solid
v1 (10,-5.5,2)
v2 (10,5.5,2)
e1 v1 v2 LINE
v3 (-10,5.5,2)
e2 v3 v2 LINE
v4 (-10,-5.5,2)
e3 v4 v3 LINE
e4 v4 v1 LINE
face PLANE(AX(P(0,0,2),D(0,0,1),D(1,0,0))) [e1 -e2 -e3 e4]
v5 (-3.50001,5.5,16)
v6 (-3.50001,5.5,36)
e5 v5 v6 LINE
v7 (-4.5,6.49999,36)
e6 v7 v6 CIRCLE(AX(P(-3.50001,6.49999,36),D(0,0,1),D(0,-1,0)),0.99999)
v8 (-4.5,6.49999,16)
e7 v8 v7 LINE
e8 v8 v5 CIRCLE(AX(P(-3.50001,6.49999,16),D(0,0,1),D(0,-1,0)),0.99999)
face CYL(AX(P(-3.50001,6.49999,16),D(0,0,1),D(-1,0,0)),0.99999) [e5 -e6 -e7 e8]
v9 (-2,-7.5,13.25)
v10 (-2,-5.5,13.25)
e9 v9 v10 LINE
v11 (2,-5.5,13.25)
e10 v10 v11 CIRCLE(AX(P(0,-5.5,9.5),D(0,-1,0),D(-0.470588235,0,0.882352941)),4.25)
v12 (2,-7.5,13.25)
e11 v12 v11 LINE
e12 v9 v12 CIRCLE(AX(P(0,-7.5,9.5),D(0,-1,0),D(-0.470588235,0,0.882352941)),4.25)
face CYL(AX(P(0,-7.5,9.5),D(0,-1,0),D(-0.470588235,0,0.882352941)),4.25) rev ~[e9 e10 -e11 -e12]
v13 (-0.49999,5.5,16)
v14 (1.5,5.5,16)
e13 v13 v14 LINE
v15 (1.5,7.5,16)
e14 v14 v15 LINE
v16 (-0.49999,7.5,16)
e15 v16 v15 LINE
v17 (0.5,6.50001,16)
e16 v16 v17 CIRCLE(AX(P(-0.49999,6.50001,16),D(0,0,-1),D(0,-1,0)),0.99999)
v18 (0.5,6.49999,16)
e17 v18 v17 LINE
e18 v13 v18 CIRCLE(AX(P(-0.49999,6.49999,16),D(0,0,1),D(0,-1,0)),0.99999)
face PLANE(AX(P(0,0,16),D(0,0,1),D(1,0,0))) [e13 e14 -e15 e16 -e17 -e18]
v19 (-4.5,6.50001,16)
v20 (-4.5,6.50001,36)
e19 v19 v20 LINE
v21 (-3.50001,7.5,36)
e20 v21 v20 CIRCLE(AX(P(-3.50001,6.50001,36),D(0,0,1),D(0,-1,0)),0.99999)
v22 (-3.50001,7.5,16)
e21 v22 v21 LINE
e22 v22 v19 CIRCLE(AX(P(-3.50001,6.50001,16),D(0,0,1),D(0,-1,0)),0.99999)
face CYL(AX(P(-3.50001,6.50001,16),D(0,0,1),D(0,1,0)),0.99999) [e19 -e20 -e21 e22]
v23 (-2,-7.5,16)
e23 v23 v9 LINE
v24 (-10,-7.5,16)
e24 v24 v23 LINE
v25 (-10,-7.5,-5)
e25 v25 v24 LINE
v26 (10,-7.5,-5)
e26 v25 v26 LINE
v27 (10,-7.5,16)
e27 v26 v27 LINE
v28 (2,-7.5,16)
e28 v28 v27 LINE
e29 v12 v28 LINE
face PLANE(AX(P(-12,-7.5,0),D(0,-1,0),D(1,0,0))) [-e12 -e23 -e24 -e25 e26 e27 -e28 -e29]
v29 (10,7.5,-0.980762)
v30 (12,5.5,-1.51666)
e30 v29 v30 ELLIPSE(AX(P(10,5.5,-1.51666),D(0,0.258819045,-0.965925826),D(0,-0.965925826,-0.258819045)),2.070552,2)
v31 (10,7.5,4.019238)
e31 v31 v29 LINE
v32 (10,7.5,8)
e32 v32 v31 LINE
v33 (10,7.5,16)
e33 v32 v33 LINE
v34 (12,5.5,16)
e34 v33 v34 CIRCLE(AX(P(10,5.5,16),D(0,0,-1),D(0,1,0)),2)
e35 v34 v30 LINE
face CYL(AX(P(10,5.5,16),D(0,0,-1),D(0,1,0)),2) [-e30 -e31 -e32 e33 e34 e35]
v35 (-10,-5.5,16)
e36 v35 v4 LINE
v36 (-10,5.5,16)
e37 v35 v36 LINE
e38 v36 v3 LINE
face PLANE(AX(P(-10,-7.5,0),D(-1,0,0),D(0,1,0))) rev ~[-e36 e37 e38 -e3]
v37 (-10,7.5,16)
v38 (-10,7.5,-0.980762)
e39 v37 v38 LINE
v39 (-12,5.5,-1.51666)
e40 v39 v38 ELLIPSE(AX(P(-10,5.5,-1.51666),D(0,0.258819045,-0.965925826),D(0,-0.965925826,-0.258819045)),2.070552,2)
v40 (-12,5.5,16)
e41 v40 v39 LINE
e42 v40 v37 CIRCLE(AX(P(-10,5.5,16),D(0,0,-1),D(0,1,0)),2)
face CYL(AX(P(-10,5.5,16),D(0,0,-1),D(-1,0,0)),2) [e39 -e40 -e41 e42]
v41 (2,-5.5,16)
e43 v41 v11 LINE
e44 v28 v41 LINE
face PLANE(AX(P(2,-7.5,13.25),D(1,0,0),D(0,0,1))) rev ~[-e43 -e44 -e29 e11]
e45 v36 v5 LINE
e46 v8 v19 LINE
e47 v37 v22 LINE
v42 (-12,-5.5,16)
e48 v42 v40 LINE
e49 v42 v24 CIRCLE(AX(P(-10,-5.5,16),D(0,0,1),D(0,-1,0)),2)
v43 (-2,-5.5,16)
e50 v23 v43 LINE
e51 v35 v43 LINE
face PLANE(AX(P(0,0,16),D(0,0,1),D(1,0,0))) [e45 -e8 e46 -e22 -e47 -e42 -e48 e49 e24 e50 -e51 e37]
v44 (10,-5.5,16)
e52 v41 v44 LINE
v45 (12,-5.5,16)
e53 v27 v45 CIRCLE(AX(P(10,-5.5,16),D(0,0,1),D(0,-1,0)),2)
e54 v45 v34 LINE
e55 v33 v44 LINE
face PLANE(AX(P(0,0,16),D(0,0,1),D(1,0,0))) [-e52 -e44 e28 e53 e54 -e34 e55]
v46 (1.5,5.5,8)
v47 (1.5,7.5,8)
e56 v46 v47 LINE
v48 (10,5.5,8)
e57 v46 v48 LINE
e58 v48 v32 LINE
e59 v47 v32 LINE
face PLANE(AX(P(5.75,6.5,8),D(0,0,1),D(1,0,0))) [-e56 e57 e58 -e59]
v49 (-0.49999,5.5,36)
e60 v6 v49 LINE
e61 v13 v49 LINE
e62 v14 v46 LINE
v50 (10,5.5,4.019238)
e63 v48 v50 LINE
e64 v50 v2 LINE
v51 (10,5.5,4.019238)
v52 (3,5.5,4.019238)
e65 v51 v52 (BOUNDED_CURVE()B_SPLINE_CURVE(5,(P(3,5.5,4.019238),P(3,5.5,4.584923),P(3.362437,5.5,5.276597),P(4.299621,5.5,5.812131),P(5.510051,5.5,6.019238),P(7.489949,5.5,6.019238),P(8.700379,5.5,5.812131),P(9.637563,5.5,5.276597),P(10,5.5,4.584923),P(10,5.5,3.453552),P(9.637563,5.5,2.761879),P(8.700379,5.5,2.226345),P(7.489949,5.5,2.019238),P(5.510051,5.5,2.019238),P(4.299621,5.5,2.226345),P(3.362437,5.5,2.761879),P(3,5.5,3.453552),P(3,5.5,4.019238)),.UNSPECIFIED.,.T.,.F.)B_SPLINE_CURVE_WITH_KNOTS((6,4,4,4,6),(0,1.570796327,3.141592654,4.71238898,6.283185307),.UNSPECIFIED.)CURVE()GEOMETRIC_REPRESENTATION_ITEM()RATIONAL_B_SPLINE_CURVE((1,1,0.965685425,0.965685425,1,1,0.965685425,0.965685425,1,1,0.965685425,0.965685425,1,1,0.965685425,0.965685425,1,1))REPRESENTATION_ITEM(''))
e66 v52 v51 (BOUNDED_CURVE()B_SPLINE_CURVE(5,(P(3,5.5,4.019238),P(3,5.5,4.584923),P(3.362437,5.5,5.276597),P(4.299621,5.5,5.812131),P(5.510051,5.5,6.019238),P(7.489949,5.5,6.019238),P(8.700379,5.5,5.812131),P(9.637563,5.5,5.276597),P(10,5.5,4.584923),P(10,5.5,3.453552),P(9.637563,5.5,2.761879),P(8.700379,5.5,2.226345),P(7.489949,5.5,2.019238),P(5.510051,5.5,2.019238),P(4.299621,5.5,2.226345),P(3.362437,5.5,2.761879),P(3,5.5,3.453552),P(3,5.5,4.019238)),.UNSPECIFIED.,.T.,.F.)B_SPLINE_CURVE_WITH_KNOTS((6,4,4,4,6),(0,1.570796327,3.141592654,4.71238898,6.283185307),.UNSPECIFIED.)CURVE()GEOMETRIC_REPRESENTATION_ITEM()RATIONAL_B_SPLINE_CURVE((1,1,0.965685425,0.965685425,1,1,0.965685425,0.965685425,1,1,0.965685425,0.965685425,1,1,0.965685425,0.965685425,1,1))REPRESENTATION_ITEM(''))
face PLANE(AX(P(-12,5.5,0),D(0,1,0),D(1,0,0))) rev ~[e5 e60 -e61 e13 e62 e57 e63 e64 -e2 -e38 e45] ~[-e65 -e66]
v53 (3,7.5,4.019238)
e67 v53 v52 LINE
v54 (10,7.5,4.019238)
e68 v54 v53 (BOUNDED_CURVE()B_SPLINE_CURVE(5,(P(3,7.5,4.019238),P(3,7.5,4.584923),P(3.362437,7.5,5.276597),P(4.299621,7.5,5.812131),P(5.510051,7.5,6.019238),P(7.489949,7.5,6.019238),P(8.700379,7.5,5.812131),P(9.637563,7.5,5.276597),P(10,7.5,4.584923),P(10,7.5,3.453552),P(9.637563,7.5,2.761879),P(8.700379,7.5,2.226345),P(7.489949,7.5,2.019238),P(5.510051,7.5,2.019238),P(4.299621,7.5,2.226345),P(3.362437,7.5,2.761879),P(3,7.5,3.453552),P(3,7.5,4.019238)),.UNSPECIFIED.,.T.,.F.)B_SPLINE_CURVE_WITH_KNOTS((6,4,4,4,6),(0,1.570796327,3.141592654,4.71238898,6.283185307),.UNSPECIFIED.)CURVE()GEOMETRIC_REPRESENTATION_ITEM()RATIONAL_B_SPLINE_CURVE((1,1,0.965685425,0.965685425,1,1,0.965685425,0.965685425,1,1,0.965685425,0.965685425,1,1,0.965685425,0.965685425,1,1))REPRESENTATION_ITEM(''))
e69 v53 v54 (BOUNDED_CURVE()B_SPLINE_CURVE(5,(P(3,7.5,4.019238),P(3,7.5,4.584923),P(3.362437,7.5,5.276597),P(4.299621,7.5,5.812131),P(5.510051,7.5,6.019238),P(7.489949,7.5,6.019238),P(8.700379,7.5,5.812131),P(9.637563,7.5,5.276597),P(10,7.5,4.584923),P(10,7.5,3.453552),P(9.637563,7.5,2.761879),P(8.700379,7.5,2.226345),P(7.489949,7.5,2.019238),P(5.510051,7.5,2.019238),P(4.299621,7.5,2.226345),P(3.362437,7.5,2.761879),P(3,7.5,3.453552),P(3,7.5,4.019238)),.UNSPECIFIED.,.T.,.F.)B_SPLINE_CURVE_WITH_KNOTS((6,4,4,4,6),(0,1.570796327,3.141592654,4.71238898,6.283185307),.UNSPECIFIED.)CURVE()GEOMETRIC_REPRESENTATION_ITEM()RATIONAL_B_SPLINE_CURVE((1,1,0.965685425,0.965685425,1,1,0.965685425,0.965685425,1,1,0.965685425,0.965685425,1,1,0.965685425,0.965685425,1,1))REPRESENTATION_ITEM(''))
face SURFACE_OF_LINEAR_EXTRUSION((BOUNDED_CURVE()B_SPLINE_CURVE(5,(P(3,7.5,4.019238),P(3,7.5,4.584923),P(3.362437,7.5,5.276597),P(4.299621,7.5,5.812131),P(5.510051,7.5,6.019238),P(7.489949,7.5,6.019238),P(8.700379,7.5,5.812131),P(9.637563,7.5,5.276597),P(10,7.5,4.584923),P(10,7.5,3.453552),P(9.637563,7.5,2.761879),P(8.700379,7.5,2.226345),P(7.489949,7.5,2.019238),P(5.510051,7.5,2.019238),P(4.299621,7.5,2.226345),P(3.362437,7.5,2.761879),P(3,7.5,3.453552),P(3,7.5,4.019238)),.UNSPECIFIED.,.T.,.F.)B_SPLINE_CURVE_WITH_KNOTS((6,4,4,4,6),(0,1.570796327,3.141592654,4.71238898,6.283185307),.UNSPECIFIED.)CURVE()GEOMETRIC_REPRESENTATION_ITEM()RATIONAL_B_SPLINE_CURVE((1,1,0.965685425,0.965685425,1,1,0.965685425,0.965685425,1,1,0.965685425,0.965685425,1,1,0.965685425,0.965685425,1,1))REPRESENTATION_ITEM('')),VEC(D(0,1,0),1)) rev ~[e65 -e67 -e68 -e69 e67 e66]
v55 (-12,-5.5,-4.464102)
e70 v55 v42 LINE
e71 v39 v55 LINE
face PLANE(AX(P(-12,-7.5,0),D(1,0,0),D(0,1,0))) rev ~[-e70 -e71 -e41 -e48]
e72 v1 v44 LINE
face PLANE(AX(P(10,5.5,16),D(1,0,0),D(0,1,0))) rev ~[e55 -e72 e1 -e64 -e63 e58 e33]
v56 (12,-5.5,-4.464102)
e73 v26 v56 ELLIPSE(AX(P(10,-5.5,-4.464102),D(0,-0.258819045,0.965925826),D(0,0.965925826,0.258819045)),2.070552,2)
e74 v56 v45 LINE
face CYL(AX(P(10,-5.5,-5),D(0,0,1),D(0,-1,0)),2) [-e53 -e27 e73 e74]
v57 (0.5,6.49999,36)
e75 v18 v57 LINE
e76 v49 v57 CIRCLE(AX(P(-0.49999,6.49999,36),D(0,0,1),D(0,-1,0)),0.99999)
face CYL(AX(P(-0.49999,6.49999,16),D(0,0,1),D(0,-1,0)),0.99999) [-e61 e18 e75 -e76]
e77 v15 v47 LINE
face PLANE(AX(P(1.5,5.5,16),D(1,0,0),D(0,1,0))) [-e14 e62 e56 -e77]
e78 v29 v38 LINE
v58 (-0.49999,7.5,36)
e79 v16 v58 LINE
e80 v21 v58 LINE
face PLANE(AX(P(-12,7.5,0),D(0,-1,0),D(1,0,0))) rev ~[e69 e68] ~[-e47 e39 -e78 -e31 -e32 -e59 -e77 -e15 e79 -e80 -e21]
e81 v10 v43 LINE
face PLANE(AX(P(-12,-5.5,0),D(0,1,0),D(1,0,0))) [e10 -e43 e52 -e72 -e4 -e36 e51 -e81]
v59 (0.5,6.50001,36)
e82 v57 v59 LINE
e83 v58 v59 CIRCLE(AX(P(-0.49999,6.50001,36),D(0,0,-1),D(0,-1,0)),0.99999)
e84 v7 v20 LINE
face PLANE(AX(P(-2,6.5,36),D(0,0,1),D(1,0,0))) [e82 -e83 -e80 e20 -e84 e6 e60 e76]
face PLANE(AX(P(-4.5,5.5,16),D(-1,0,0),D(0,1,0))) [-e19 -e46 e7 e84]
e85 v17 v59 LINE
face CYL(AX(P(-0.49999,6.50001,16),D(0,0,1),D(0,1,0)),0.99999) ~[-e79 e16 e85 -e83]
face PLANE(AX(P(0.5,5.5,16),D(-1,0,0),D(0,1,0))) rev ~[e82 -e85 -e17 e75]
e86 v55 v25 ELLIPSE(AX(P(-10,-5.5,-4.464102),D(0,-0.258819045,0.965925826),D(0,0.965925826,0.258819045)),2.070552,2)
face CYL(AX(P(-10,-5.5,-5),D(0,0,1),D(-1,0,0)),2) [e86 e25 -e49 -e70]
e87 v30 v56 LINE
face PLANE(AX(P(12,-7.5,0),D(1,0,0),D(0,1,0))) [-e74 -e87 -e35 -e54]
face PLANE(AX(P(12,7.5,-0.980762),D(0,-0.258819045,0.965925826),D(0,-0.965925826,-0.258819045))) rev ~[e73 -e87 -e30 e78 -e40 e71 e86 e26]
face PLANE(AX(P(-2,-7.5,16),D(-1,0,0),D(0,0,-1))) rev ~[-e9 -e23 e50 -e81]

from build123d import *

# Parameters (mm, degrees)
F0_W      = 24
F0_H      = 15
F1_DEPTH  = 16
F2_T      = -2
F4_DEPTH  = 5
F5_W      = 5
F5_H      = 2
F6_DEPTH  = 20
F7_R      = 0.99999
F8_W      = 8.5
F8_H      = 2
F9_DEPTH  = 8
F10_DEPTH = 5
F12_DEPTH = 25
F13_R     = 2
F15_DEPTH = 2


# Not quite as in the source:
# - a fillet or chamfer is up to 0.001 mm smaller than in the source, because OpenCascade refuses the exact size


with BuildPart() as f1:
    # F0 (on Top) → F1 (new body)
    with BuildSketch(Plane.XY):
        Rectangle(F0_W, F0_H)
    extrude(amount=F1_DEPTH)

    # F2
    f2_openings = [f1.faces().sort_by_distance(p)[0] for p in [
        (0, 0, 16),
    ]]
    offset(amount=F2_T, openings=f2_openings)

    # F3 (on face) → F4 (cut)
    with BuildSketch(Plane.XZ.offset(7.5)):
        with BuildLine():
            Line((-2, 16), (-2, 13.25))
            ThreePointArc((-2, 13.25), (0, 5.25), (2, 13.25))
            Line((2, 13.25), (2, 16))
            Line((2, 16), (-2, 16))
        make_face()
    extrude(amount=-F4_DEPTH, mode=Mode.SUBTRACT)

    # F5 (on face) → F6 (join)
    with BuildSketch(Plane.XY.offset(16)):
        with Locations((-2, 6.5)):
            Rectangle(F5_W, F5_H)
    extrude(amount=F6_DEPTH)

    # F7 (radius 1 in the source; OpenCascade refuses exactly that, so slightly less here)
    f7_edges = [f1.edges().sort_by_distance(p)[0] for p in [
        (0.5, 5.5, 26),
        (0.5, 7.5, 26),
        (-4.5, 5.5, 26),
        (-4.5, 7.5, 26),
    ]]
    fillet(f7_edges, radius=F7_R)

    # F8 (on face) → F9 (cut)
    with BuildSketch(Plane.XY.offset(16)):
        with Locations((5.75, 6.5)):
            Rectangle(F8_W, F8_H)
    extrude(amount=-F9_DEPTH, mode=Mode.SUBTRACT)

    # F10 (add): a face of the model
    f10_faces = [f1.faces().sort_by_distance(p)[0] for p in [
        (0, 0, 0),
    ]]
    extrude(f10_faces, amount=F10_DEPTH)

    # F11 (on face) → F12 (cut)
    with BuildSketch(Plane.YZ.offset(12)):
        Polygon((7.5, -0.9807621135), (-7.5, -5), (7.5, -5), align=None)
    extrude(amount=-F12_DEPTH, mode=Mode.SUBTRACT)

    # F13
    f13_edges = [f1.edges().sort_by_distance(p)[0] for p in [
        (12, -7.5, 5.5),
        (-12, -7.5, 5.5),
        (-12, 7.5, 7.509619),
        (12, 7.5, 7.509619),
    ]]
    fillet(f13_edges, radius=F13_R)

    # F14 (on face) → F15 (cut)
    with BuildSketch(Plane(origin=(0, 7.5, 0), x_dir=(-1, 0, 0), z_dir=(0, 1, 0))):
        with BuildLine():
            add(Edge.make_bspline(
                [(-10, 4.0192378865), (-10, 2.0192378865), (-6.5, 2.0192378865), (-3, 2.0192378865), (-3, 4.0192378865)],
                knots=[3.1415926536, 3.1415926536, 3.1415926536, 4.7123889804, 4.7123889804, 6.2831853072, 6.2831853072, 6.2831853072], degree=2, weights=[1, 0.7071067812, 1, 0.7071067812, 1]))
            add(Edge.make_bspline(
                [(-3, 4.0192378865), (-3, 6.0192378865), (-6.5, 6.0192378865), (-10, 6.0192378865), (-10, 4.0192378865)],
                knots=[0, 0, 0, 1.5707963268, 1.5707963268, 3.1415926536, 3.1415926536, 3.1415926536], degree=2, weights=[1, 0.7071067812, 1, 0.7071067812, 1]))
        make_face()
    extrude(amount=-F15_DEPTH, mode=Mode.SUBTRACT)


solid = f1.part
